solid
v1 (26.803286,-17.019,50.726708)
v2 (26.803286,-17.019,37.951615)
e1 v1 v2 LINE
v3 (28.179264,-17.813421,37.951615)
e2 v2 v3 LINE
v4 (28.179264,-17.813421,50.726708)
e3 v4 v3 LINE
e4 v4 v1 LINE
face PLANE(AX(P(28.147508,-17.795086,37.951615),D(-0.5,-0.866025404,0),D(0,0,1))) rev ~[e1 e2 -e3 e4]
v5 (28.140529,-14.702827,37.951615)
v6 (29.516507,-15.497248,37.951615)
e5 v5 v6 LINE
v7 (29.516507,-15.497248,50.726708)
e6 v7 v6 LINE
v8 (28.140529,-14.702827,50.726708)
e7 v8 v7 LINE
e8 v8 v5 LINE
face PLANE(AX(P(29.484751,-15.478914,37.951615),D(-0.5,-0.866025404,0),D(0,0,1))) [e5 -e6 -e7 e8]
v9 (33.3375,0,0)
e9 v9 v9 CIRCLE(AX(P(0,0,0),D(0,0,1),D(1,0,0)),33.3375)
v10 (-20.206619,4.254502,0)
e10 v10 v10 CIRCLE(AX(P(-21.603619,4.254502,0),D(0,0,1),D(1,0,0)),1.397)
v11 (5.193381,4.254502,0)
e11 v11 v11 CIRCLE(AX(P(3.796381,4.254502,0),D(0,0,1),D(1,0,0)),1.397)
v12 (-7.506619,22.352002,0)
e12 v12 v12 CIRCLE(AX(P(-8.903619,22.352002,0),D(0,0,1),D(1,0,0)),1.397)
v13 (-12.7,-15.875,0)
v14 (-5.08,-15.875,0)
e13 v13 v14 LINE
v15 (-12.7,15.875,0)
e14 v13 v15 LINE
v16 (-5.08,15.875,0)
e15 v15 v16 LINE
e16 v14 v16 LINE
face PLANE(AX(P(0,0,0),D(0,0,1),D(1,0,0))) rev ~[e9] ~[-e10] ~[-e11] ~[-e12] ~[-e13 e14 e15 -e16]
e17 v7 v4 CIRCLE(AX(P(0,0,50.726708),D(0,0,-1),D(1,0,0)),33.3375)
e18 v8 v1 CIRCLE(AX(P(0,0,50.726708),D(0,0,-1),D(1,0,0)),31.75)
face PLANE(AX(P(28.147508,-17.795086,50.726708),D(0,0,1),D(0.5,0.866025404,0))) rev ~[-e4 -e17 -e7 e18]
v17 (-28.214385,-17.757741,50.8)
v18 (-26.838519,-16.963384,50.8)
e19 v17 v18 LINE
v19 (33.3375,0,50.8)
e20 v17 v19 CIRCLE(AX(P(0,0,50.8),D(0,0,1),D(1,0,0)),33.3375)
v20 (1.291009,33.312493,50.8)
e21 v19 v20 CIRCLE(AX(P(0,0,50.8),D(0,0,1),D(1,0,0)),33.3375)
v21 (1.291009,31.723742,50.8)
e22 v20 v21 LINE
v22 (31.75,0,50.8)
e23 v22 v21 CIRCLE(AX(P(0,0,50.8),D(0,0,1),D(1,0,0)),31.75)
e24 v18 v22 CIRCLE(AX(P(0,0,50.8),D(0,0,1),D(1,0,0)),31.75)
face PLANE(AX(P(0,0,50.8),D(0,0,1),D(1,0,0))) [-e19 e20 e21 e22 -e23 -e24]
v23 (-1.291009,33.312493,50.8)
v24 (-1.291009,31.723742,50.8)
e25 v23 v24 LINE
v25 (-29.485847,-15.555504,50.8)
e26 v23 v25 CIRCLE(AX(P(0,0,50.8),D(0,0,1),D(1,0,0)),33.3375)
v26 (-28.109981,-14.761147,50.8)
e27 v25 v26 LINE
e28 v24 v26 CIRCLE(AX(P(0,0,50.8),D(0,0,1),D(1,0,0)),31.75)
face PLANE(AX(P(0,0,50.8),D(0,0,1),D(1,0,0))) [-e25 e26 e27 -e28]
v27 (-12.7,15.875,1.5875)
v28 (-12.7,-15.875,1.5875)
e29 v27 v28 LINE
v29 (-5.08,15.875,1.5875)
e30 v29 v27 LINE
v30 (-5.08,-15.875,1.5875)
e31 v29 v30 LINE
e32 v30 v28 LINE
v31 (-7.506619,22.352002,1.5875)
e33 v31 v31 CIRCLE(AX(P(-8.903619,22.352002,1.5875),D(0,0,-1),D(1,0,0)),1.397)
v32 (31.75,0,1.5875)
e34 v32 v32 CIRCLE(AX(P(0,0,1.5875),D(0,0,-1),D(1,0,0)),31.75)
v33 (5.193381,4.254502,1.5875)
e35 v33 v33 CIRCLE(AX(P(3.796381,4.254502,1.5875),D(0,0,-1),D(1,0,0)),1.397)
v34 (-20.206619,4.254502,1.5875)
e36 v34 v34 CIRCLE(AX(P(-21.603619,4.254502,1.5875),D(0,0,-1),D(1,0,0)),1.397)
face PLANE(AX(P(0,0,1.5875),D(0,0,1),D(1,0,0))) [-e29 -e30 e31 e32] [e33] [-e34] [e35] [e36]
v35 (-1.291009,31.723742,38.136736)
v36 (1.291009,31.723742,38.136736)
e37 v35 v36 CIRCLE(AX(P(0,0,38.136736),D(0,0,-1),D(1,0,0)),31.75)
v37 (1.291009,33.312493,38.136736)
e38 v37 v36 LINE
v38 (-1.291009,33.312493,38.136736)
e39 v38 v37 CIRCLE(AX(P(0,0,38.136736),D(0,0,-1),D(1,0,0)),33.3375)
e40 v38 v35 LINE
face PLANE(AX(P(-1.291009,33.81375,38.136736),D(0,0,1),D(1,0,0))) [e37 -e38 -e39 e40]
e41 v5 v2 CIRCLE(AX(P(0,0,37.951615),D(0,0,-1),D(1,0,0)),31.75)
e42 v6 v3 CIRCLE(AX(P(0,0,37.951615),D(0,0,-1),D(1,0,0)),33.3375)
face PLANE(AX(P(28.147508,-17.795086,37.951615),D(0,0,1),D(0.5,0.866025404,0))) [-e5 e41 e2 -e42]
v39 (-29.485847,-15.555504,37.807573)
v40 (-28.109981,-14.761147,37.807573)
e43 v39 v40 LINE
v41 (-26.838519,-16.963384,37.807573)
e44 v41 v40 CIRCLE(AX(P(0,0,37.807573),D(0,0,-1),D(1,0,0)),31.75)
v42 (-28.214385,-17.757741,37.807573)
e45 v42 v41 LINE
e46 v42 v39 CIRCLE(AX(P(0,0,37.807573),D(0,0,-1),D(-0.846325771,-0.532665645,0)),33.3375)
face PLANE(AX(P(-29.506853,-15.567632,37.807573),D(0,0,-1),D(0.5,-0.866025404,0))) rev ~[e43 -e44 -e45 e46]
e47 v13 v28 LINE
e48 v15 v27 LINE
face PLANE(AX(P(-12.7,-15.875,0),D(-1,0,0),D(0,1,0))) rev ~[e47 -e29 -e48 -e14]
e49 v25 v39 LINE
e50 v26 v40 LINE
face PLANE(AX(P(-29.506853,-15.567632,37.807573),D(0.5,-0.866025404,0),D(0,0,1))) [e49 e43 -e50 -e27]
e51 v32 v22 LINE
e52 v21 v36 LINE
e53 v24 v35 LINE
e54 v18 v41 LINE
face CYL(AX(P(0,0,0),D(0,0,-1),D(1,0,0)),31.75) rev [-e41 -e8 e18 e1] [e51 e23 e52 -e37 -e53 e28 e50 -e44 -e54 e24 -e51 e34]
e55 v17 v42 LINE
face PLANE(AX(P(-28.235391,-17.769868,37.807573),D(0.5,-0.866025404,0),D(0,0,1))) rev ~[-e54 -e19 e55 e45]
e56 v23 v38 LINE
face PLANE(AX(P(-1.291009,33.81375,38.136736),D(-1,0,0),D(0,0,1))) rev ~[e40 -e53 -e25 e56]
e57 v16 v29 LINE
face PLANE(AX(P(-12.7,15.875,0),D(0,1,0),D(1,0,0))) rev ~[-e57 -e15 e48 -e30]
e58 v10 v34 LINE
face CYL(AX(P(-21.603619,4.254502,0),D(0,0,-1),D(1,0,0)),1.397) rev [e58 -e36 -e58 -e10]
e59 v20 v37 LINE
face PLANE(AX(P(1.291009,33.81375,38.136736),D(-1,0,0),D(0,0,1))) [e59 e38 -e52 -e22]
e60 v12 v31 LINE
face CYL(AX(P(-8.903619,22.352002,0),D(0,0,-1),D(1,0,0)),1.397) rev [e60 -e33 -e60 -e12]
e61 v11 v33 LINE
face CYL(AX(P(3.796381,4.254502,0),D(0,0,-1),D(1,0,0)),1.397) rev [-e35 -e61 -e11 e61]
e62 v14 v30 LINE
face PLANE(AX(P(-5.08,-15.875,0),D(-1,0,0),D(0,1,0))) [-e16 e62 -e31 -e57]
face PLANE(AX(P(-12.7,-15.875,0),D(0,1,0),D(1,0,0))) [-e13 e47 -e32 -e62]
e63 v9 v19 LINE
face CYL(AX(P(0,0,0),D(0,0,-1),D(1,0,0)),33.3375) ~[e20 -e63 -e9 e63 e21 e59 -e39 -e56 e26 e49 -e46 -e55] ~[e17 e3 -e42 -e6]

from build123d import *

# Parameters (mm, degrees)
F0_R           = 33.3375
F1_DEPTH       = 50.8
F2_T           = -1.5875
F6_W           = 2.5429241359
F6_H           = 13.1887868047
F7_DEPTH       = 12.7
F10_W          = 2.6744855568
F10_H          = 12.775093317
F11_DEPTH      = 2.794
F11_DEPTH_BACK = 2.413
F13_W          = 2.5820170995
F13_H          = 12.7615630627
F14_DEPTH      = 5.0546
F14_DEPTH_BACK = 4.7244
F15_W          = 7.62
F15_H          = 31.75
F15_R          = 1.397
F16_DEPTH      = 9.906


# Not quite as in the source:
# - a feature names something its author has since deleted; it is built from what else it names


with BuildPart() as f1:
    # F0 (on Top) → F1 (new body)
    with BuildSketch(Plane.XY):
        Circle(F0_R)
    extrude(amount=F1_DEPTH)

    # F2
    f2_openings = [f1.faces().sort_by_distance(p)[0] for p in [
        (0, 0, 50.8),
    ]]
    offset(amount=F2_T, openings=f2_openings)

    # F6 (on offset) → F7 (cut)
    with BuildSketch(Plane(origin=(-28.8711218987, -16.66875, 0), x_dir=(0.5, -0.8660254038, 0), z_dir=(-0.8660254038, -0.5, 0))):
        with Locations((0, 44.4019660354)):
            Rectangle(F6_W, F6_H)
    extrude(amount=-F7_DEPTH, mode=Mode.SUBTRACT)

    # F10 (on offset) → F11 (cut, two sides)
    with BuildSketch(Plane(origin=(28.8161292855, -16.637, 0), x_dir=(0.5, 0.8660254038, 0), z_dir=(0.8660254038, -0.5, 0))) as f11_sk:
        with Locations((0, 44.3391613662)):
            Rectangle(F10_W, F10_H)
    extrude(amount=-F11_DEPTH, mode=Mode.SUBTRACT)
    extrude(f11_sk.sketch, amount=F11_DEPTH_BACK, mode=Mode.SUBTRACT)

    # F13 (on offset) → F14 (cut, two sides)
    with BuildSketch(Plane.XZ.offset(-33.81375)) as f14_sk:
        with Locations((0, 44.5175170898)):
            Rectangle(F13_W, F13_H)
    extrude(amount=-F14_DEPTH, mode=Mode.SUBTRACT)
    extrude(f14_sk.sketch, amount=F14_DEPTH_BACK, mode=Mode.SUBTRACT)

    # F15 (on Top) → F16 (cut)
    with BuildSketch(Plane.XY):
        with Locations((-8.89, 0)):
            Rectangle(F15_W, F15_H)
        with Locations((-21.6036192909, 4.2545016563)):
            Circle(F15_R)
        with Locations((3.7963807091, 4.2545016563)):
            Circle(F15_R)
        with Locations((-8.9036192909, 22.3520016563)):
            Circle(F15_R)
    extrude(amount=F16_DEPTH, mode=Mode.SUBTRACT)


solid = f1.part
